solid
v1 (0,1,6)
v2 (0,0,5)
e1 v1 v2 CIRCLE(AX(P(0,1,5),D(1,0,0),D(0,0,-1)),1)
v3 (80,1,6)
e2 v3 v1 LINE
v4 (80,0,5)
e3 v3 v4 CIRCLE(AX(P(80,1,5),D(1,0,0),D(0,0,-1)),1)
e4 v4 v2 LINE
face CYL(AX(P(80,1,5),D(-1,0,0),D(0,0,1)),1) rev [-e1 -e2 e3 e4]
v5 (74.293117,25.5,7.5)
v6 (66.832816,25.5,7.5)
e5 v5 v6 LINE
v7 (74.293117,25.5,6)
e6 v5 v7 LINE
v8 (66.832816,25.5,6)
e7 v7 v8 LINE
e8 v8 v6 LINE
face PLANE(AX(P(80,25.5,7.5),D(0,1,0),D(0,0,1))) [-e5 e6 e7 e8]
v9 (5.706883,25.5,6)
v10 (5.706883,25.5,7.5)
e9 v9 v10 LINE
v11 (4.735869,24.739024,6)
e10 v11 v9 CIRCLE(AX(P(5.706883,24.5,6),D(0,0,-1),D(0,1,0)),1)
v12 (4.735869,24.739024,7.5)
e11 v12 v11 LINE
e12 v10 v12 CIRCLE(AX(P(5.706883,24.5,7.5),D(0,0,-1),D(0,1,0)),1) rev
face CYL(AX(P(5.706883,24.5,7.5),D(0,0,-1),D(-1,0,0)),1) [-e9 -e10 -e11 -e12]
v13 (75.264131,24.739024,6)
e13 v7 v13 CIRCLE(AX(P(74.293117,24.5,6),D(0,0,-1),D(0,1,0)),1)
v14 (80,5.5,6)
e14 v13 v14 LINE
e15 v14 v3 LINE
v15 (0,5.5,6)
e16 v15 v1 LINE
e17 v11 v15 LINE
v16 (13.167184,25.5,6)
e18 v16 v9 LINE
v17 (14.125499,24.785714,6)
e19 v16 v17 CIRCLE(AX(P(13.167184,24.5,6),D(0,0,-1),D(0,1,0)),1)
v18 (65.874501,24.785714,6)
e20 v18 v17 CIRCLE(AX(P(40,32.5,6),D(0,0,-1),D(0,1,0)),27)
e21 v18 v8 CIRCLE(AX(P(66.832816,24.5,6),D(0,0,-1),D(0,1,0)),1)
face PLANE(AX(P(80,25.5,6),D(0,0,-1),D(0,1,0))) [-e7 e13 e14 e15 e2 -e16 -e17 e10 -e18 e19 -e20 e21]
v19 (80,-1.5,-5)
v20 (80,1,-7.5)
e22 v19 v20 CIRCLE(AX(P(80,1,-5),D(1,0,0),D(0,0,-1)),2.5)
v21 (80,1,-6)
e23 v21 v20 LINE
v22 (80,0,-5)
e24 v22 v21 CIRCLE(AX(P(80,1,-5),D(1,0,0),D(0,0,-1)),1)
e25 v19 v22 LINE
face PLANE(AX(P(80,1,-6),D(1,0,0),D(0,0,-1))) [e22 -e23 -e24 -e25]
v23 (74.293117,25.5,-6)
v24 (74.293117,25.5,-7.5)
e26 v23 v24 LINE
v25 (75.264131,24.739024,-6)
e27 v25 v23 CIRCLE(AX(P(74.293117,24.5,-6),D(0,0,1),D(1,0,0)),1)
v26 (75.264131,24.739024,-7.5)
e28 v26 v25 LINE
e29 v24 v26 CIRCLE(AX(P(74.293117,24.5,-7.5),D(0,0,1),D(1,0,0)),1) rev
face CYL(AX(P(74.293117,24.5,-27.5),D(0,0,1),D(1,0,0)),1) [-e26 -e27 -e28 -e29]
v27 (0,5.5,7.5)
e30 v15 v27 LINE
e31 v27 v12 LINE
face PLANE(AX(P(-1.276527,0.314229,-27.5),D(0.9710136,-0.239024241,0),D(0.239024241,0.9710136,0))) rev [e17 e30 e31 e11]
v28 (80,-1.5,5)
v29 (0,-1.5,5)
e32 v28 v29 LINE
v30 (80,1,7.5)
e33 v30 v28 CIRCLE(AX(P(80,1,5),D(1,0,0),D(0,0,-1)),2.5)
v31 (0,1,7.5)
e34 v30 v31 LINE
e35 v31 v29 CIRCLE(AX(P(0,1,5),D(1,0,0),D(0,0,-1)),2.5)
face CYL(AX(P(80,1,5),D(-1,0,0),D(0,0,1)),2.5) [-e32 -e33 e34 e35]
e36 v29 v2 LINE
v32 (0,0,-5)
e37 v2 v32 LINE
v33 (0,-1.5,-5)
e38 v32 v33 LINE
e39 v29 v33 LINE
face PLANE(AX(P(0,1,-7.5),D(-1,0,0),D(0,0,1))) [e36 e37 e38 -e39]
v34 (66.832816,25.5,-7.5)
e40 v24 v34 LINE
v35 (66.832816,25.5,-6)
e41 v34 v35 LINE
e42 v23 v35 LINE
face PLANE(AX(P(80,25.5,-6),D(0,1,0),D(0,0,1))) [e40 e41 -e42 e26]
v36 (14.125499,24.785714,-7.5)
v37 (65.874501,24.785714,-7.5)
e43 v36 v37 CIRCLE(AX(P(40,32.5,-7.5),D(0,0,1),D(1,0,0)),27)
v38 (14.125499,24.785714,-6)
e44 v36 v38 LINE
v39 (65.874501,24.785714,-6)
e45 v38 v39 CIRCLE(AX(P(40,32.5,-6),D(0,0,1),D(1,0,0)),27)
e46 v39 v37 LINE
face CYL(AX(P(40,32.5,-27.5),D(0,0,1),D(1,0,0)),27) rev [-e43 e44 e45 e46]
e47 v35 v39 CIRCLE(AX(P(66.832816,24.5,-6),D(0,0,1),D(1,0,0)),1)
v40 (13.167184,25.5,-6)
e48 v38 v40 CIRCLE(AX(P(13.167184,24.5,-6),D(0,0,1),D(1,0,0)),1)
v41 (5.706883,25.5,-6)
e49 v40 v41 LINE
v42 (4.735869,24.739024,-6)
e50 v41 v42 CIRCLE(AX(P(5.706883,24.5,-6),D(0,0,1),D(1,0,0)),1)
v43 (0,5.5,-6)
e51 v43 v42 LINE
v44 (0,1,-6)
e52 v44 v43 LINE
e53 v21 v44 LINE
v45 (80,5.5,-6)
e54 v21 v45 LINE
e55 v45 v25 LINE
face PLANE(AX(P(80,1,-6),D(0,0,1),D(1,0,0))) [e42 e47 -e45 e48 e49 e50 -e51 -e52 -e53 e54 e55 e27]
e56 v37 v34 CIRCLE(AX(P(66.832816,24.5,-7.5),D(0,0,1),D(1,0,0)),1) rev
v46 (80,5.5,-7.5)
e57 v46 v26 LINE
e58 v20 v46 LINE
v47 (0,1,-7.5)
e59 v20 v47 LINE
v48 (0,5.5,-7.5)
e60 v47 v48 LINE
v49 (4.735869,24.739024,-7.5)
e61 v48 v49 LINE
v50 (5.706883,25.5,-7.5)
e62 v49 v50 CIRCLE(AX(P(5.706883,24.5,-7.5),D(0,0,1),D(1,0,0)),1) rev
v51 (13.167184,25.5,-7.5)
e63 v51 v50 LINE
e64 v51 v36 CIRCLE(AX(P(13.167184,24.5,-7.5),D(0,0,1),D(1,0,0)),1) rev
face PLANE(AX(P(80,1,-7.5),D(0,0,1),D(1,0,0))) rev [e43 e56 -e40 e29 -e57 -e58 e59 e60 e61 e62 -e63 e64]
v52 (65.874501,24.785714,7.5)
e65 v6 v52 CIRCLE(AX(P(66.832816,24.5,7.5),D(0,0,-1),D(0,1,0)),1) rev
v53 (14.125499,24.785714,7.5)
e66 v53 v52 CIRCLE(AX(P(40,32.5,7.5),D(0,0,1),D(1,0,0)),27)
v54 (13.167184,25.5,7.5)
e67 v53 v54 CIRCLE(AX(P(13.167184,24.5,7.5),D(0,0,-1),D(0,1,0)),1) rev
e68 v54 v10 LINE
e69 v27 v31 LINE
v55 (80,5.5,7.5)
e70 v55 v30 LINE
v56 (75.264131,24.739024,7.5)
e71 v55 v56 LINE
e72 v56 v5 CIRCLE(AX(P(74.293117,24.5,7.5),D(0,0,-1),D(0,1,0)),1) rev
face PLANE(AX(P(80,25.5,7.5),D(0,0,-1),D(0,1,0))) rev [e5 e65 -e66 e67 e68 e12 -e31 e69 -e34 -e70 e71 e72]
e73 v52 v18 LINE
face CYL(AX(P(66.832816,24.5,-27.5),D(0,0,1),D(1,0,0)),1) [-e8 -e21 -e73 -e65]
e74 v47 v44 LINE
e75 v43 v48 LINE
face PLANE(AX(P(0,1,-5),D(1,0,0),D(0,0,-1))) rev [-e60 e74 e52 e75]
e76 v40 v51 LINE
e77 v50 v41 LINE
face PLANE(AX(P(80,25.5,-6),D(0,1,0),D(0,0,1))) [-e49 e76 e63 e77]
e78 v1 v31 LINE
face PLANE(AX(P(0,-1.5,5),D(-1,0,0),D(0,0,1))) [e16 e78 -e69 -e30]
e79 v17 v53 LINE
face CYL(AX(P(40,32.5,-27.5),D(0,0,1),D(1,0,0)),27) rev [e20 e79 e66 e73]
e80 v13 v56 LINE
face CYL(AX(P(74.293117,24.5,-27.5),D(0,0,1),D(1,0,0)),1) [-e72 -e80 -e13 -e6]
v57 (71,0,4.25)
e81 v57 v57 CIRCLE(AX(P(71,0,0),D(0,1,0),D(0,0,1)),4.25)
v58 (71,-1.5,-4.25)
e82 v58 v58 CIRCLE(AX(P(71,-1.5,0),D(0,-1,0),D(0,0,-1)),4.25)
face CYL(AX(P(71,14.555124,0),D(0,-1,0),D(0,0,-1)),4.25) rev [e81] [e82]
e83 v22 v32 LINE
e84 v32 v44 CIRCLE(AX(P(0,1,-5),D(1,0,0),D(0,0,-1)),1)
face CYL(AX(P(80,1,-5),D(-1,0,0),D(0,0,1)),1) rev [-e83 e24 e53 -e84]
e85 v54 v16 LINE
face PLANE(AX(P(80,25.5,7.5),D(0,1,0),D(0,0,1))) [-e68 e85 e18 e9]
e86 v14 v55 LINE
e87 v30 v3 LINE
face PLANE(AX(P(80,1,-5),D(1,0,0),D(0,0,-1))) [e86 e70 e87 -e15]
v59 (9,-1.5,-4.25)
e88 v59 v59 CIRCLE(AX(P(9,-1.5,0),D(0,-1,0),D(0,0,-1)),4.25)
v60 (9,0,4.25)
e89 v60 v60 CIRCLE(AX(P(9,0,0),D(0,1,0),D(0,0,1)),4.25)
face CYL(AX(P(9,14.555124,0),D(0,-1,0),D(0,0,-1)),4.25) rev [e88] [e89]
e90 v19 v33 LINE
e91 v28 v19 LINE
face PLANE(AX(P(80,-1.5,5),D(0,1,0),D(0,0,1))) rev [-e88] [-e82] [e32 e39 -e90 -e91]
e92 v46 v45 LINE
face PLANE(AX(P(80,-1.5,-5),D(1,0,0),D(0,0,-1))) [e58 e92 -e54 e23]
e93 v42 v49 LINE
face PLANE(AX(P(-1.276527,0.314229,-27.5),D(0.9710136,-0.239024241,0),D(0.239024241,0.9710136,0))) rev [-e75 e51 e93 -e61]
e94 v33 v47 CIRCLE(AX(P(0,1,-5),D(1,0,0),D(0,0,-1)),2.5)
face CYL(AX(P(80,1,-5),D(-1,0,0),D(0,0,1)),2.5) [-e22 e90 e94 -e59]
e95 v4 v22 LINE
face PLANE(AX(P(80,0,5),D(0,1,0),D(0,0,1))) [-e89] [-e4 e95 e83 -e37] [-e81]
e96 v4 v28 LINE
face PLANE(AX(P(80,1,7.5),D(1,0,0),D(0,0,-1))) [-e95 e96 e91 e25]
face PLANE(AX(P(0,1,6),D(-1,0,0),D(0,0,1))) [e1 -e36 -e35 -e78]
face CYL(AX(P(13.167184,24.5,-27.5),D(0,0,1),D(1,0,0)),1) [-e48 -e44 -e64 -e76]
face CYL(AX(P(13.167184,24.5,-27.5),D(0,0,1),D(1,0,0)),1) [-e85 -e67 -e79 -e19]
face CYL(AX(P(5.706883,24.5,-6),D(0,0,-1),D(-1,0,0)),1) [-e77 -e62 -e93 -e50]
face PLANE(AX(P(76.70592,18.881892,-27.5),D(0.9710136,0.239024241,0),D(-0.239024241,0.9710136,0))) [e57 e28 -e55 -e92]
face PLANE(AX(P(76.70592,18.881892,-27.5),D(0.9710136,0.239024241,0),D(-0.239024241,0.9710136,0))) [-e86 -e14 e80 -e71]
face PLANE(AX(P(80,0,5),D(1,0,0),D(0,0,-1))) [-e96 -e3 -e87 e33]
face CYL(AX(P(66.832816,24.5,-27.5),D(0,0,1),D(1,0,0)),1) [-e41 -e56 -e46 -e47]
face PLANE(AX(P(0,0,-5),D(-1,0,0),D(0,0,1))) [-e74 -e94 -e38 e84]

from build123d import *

# Parameters (mm, degrees)
SM_BASE_FLANGE_1_DEPTH = 80
CUT_EXTRUDE_1_DEPTH    = 35
FILLET_1_R             = 1
EXTRUDE_START          = -1.5
EXTRUDE_1_OUTLINE_R    = 4.25
EXTRUDE_1_DEPTH        = 1.5


# Read off the part's stored shape, not the designer's step: Бобышка-Вытянуть1
# Sheet-metal steps are written as plain solids
with BuildPart() as part:
    # Sketch 1 → Базовая кромка1 (new body)
    with BuildSketch(Plane(origin=(0, 0, 0), x_dir=(0, 0, -1), z_dir=(1, 0, 0))):
        with BuildLine():
            Line((-6, 25.5), (-6, 1))
            ThreePointArc((-6, 1), (-5.707106781, 0.292893219), (-5, 0))
            Line((-5, 0), (5, 0))
            ThreePointArc((5, 0), (5.707106781, 0.292893219), (6, 1))
            Line((6, 1), (6, 25.5))
            Line((6, 25.5), (7.5, 25.5))
            Line((7.5, 25.5), (7.5, 1))
            ThreePointArc((7.5, 1), (6.767766953, -0.767766953), (5, -1.5))
            Line((5, -1.5), (-5, -1.5))
            ThreePointArc((-5, -1.5), (-6.767766953, -0.767766953), (-7.5, 1))
            Line((-7.5, 1), (-7.5, 25.5))
            Line((-7.5, 25.5), (-6, 25.5))
        make_face()
    extrude(amount=SM_BASE_FLANGE_1_DEPTH)

    # Эскиз6 → Вырез-Вытянуть1 (cut)
    with BuildSketch(Plane.XY.offset(7.5)):
        Polygon((80, 25.5), (75.076809621, 25.5), (80, 5.5), align=None)
        with BuildLine():
            ThreePointArc((13.923190379, 25.5), (23.568323275, 11.075714714), (40, 5.5))
            Line((40, 5.5), (40, 25.5))
            Line((40, 25.5), (13.923190379, 25.5))
        make_face()
        with BuildLine():
            Line((40, 25.5), (40, 5.5))
            ThreePointArc((40, 5.5), (56.431676725, 11.075714714), (66.076809621, 25.5))
            Line((66.076809621, 25.5), (40, 25.5))
        make_face()
        Polygon((0, 5.5), (4.923190379, 25.5), (0, 25.5), align=None)
    extrude(amount=-CUT_EXTRUDE_1_DEPTH, mode=Mode.SUBTRACT)

    # Скругление1
    fillet_1_edges = [part.edges().sort_by_distance(p)[0] for p in [
        (75.076809621, 25.5, -6.75),
        (75.076809621, 25.5, 6.75),
        (13.923190379, 25.5, -6.75),
        (66.076809621, 25.5, -6.75),
        (13.923190379, 25.5, 6.75),
        (66.076809621, 25.5, 6.75),
        (4.923190379, 25.5, -6.75),
        (4.923190379, 25.5, 6.75),
    ]]
    fillet(fillet_1_edges, radius=FILLET_1_R)

    # Бобышка-Вытянуть1 outline → Бобышка-Вытянуть1 (cut)
    with BuildSketch(Plane.XZ.offset(1.5).offset(EXTRUDE_START)):
        with Locations((71, 0)):
            Circle(EXTRUDE_1_OUTLINE_R)
        with Locations((9, 0)):
            Circle(EXTRUDE_1_OUTLINE_R)
    extrude(amount=EXTRUDE_1_DEPTH, mode=Mode.SUBTRACT)


solid = part.part
